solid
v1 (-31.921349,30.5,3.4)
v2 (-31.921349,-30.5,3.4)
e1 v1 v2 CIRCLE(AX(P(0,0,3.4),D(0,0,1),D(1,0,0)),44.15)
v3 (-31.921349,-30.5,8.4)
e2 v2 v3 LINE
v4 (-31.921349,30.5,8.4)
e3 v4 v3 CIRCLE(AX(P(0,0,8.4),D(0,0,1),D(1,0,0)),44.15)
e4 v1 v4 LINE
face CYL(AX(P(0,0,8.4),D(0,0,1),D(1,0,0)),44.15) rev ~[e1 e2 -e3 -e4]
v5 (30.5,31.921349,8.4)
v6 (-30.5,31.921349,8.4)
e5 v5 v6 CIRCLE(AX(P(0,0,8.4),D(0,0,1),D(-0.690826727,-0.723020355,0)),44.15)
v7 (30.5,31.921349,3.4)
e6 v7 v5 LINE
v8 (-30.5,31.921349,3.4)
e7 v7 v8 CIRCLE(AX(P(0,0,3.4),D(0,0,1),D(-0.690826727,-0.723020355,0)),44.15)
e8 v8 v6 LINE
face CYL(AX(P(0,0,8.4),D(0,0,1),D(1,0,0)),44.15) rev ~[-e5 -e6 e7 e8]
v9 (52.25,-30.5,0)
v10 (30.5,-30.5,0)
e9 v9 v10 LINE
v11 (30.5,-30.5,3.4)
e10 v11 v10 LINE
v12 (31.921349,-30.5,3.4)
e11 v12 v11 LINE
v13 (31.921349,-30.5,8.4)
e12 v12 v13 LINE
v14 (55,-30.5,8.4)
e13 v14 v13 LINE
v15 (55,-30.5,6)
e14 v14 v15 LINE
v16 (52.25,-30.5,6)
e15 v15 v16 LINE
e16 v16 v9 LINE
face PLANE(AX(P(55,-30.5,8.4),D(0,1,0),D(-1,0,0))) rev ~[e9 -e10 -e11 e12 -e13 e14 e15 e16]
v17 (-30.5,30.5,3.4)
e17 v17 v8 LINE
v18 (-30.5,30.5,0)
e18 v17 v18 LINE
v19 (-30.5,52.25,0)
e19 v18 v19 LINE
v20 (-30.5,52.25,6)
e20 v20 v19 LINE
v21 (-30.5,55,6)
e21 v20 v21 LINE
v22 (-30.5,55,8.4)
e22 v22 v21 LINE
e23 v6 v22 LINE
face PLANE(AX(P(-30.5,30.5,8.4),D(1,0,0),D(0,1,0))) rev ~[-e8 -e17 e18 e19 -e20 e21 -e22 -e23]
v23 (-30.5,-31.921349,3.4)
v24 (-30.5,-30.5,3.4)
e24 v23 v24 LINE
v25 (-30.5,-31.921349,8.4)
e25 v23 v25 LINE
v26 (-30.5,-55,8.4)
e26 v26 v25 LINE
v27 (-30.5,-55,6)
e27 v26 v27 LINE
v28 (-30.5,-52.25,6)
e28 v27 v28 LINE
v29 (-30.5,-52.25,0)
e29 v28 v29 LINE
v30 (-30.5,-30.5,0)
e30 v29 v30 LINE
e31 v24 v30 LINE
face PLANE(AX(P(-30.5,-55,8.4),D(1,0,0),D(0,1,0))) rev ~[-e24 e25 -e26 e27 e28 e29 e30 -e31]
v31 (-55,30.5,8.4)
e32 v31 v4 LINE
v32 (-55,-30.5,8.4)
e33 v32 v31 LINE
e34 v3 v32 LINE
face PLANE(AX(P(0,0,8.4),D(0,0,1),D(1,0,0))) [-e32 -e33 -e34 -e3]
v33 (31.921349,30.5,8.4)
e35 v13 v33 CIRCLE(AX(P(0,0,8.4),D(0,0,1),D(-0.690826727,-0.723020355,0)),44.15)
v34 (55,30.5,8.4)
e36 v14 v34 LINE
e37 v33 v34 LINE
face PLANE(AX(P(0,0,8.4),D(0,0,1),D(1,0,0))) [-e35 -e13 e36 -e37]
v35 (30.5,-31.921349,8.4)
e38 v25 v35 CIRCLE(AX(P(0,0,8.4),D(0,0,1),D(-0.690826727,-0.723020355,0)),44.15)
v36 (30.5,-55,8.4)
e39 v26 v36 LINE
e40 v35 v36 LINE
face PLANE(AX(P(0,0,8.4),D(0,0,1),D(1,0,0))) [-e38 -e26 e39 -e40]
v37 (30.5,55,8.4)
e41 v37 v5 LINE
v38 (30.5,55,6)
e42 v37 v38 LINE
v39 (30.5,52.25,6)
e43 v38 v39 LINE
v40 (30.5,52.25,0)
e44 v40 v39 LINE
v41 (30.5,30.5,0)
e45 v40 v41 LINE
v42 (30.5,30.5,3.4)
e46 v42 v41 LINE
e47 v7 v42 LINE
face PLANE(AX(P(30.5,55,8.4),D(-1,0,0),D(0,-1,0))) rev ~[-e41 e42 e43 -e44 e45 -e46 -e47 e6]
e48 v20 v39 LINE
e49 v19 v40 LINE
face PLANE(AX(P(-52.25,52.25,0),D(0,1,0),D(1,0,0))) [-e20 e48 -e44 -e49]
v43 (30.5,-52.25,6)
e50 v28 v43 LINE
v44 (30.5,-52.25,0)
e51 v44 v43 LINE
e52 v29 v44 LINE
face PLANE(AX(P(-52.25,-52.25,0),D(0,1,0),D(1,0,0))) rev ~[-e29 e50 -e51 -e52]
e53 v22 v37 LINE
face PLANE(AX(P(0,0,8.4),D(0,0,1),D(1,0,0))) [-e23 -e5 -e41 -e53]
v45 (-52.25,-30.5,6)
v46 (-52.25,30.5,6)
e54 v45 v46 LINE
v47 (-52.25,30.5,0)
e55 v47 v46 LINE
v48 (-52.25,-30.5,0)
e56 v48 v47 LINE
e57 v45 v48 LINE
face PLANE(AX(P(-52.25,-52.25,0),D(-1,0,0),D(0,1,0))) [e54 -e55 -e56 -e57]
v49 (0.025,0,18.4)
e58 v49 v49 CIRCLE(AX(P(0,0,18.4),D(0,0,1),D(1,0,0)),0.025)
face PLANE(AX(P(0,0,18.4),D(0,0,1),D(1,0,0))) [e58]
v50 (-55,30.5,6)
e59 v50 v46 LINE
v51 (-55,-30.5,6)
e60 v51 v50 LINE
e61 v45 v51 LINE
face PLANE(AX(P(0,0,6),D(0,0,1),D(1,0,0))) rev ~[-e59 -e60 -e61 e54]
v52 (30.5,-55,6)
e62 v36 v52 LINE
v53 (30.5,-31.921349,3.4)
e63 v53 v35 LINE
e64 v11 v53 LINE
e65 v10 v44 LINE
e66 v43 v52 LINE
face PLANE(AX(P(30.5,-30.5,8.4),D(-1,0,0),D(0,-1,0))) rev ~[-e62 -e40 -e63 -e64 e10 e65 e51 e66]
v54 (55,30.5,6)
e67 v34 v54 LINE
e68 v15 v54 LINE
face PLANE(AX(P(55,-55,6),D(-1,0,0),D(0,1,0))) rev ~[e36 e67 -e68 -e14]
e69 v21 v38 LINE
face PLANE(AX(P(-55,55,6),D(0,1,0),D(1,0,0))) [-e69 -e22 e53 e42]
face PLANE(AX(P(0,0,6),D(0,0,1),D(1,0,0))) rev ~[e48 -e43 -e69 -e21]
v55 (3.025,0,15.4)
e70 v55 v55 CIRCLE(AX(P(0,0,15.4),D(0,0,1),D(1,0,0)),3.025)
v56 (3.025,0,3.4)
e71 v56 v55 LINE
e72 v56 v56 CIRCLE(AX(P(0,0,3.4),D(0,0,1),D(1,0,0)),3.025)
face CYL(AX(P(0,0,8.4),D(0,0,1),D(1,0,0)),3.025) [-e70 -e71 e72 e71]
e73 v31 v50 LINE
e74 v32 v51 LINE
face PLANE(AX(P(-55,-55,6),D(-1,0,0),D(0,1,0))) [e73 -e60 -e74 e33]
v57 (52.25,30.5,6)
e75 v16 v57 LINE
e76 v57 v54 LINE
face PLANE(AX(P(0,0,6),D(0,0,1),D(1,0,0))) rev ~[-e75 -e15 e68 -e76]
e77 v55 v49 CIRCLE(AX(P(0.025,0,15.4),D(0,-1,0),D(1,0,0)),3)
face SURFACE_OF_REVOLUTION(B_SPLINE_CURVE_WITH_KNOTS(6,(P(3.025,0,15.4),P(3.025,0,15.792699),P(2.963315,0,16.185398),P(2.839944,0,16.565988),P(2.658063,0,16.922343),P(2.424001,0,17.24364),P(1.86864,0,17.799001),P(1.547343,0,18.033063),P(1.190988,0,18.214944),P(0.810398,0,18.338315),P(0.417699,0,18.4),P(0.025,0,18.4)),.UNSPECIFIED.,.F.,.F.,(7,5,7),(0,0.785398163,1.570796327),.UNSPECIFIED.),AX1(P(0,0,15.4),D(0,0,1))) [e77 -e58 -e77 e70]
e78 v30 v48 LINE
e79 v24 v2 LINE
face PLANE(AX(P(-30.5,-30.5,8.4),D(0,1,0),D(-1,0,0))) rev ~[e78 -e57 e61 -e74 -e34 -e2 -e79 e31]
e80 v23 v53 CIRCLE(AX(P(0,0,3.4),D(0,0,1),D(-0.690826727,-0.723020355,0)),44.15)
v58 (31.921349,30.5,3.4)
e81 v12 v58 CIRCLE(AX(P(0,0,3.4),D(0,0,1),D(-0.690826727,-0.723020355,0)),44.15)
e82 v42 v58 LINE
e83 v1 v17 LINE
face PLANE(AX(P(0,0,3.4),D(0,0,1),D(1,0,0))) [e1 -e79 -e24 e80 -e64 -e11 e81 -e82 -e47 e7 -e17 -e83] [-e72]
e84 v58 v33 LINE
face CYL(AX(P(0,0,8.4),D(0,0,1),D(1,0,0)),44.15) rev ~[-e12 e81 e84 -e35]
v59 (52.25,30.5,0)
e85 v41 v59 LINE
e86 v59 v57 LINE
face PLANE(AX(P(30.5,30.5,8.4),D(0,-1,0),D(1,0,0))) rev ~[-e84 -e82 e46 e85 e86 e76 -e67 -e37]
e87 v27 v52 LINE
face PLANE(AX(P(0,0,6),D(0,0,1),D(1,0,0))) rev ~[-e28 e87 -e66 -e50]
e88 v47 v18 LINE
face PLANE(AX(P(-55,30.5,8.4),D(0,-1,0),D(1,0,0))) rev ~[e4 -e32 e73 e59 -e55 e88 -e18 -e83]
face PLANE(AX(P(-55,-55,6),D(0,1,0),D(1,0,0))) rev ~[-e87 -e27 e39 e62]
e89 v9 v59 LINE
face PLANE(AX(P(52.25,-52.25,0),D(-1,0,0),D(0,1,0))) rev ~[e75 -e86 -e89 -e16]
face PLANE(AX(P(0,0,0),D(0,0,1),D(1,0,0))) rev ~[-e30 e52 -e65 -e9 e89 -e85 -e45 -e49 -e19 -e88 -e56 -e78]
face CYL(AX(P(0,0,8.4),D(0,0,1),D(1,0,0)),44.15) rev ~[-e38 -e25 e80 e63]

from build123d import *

# Parameters (mm, degrees)
F0_W             = 104.5
F0_H             = 104.5
F1_DEPTH         = 6
F2_W             = 110
F2_H             = 110
F2_W_2           = 104.5
F2_H_2           = 104.5
F3_DEPTH         = 2.4
F4_R             = 3.025
F5_DEPTH         = 10
F6_R             = 44.15
F6_R_2           = 3.025
F7_DEPTH         = 5
F8_R             = 3
F10_DEPTH        = 8.401
F10_COPIES_COUNT = 4


# Not quite as in the source:
# - a pattern or mirror of a feature is missing from the dataset's text; its kind, count and spacing are read off the source's solid


with BuildPart() as f1:
    # F0 (on Top) → F1 (new body)
    with BuildSketch(Plane.XY):
        Rectangle(F0_W, F0_H)
    extrude(amount=F1_DEPTH)

    # F2 (on face) → F3 (join)
    with BuildSketch(Plane.XY.offset(6)):
        Rectangle(F2_W, F2_H)
        Rectangle(F2_W_2, F2_H_2, mode=Mode.SUBTRACT)
        Rectangle(F2_W_2, F2_H_2)
    extrude(amount=F3_DEPTH)

    # F4 (on face) → F5 (join)
    with BuildSketch(Plane.XY.offset(8.4)):
        Circle(F4_R)
    extrude(amount=F5_DEPTH)

    # F6 (on face) → F7 (cut)
    with BuildSketch(Plane.XY.offset(8.4)):
        Circle(F6_R)
        Circle(F6_R_2, mode=Mode.SUBTRACT)
    extrude(amount=-F7_DEPTH, mode=Mode.SUBTRACT)

    # F8
    f8_edges = [f1.edges().sort_by_distance(p)[0] for p in [
        (-3.025, 0, 18.4),
    ]]
    fillet(f8_edges, radius=F8_R)

    # F9 (on face) → F10 (cut, through all)
    with BuildSketch(Plane.XY.offset(8.4)):
        with BuildLine():
            Line((-30.5, 31.9213486557), (-30.5, 55))
            Line((-30.5, 55), (-55, 55))
            Line((-55, 55), (-55, 30.5))
            Line((-55, 30.5), (-31.9213486557, 30.5))
            ThreePointArc((-31.9213486557, 30.5), (-31.2187643894, 31.2187643894), (-30.5, 31.9213486557))
        make_face()
        with BuildLine():
            Line((-30.5, 30.5), (-30.5, 31.9213486557))
            ThreePointArc((-30.5, 31.9213486557), (-31.2187643894, 31.2187643894), (-31.9213486557, 30.5))
            Line((-31.9213486557, 30.5), (-30.5, 30.5))
        make_face()
    f10 = extrude(amount=-F10_DEPTH, mode=Mode.SUBTRACT)

    # F10_copies: F10 ×4 about axis
    f10_copies_axis = Axis((0, 0, 0), (0, 0, 1))
    for i in range(1, F10_COPIES_COUNT):
        add(f10.rotate(f10_copies_axis, i * 360 / F10_COPIES_COUNT), mode=Mode.SUBTRACT)


solid = f1.part
